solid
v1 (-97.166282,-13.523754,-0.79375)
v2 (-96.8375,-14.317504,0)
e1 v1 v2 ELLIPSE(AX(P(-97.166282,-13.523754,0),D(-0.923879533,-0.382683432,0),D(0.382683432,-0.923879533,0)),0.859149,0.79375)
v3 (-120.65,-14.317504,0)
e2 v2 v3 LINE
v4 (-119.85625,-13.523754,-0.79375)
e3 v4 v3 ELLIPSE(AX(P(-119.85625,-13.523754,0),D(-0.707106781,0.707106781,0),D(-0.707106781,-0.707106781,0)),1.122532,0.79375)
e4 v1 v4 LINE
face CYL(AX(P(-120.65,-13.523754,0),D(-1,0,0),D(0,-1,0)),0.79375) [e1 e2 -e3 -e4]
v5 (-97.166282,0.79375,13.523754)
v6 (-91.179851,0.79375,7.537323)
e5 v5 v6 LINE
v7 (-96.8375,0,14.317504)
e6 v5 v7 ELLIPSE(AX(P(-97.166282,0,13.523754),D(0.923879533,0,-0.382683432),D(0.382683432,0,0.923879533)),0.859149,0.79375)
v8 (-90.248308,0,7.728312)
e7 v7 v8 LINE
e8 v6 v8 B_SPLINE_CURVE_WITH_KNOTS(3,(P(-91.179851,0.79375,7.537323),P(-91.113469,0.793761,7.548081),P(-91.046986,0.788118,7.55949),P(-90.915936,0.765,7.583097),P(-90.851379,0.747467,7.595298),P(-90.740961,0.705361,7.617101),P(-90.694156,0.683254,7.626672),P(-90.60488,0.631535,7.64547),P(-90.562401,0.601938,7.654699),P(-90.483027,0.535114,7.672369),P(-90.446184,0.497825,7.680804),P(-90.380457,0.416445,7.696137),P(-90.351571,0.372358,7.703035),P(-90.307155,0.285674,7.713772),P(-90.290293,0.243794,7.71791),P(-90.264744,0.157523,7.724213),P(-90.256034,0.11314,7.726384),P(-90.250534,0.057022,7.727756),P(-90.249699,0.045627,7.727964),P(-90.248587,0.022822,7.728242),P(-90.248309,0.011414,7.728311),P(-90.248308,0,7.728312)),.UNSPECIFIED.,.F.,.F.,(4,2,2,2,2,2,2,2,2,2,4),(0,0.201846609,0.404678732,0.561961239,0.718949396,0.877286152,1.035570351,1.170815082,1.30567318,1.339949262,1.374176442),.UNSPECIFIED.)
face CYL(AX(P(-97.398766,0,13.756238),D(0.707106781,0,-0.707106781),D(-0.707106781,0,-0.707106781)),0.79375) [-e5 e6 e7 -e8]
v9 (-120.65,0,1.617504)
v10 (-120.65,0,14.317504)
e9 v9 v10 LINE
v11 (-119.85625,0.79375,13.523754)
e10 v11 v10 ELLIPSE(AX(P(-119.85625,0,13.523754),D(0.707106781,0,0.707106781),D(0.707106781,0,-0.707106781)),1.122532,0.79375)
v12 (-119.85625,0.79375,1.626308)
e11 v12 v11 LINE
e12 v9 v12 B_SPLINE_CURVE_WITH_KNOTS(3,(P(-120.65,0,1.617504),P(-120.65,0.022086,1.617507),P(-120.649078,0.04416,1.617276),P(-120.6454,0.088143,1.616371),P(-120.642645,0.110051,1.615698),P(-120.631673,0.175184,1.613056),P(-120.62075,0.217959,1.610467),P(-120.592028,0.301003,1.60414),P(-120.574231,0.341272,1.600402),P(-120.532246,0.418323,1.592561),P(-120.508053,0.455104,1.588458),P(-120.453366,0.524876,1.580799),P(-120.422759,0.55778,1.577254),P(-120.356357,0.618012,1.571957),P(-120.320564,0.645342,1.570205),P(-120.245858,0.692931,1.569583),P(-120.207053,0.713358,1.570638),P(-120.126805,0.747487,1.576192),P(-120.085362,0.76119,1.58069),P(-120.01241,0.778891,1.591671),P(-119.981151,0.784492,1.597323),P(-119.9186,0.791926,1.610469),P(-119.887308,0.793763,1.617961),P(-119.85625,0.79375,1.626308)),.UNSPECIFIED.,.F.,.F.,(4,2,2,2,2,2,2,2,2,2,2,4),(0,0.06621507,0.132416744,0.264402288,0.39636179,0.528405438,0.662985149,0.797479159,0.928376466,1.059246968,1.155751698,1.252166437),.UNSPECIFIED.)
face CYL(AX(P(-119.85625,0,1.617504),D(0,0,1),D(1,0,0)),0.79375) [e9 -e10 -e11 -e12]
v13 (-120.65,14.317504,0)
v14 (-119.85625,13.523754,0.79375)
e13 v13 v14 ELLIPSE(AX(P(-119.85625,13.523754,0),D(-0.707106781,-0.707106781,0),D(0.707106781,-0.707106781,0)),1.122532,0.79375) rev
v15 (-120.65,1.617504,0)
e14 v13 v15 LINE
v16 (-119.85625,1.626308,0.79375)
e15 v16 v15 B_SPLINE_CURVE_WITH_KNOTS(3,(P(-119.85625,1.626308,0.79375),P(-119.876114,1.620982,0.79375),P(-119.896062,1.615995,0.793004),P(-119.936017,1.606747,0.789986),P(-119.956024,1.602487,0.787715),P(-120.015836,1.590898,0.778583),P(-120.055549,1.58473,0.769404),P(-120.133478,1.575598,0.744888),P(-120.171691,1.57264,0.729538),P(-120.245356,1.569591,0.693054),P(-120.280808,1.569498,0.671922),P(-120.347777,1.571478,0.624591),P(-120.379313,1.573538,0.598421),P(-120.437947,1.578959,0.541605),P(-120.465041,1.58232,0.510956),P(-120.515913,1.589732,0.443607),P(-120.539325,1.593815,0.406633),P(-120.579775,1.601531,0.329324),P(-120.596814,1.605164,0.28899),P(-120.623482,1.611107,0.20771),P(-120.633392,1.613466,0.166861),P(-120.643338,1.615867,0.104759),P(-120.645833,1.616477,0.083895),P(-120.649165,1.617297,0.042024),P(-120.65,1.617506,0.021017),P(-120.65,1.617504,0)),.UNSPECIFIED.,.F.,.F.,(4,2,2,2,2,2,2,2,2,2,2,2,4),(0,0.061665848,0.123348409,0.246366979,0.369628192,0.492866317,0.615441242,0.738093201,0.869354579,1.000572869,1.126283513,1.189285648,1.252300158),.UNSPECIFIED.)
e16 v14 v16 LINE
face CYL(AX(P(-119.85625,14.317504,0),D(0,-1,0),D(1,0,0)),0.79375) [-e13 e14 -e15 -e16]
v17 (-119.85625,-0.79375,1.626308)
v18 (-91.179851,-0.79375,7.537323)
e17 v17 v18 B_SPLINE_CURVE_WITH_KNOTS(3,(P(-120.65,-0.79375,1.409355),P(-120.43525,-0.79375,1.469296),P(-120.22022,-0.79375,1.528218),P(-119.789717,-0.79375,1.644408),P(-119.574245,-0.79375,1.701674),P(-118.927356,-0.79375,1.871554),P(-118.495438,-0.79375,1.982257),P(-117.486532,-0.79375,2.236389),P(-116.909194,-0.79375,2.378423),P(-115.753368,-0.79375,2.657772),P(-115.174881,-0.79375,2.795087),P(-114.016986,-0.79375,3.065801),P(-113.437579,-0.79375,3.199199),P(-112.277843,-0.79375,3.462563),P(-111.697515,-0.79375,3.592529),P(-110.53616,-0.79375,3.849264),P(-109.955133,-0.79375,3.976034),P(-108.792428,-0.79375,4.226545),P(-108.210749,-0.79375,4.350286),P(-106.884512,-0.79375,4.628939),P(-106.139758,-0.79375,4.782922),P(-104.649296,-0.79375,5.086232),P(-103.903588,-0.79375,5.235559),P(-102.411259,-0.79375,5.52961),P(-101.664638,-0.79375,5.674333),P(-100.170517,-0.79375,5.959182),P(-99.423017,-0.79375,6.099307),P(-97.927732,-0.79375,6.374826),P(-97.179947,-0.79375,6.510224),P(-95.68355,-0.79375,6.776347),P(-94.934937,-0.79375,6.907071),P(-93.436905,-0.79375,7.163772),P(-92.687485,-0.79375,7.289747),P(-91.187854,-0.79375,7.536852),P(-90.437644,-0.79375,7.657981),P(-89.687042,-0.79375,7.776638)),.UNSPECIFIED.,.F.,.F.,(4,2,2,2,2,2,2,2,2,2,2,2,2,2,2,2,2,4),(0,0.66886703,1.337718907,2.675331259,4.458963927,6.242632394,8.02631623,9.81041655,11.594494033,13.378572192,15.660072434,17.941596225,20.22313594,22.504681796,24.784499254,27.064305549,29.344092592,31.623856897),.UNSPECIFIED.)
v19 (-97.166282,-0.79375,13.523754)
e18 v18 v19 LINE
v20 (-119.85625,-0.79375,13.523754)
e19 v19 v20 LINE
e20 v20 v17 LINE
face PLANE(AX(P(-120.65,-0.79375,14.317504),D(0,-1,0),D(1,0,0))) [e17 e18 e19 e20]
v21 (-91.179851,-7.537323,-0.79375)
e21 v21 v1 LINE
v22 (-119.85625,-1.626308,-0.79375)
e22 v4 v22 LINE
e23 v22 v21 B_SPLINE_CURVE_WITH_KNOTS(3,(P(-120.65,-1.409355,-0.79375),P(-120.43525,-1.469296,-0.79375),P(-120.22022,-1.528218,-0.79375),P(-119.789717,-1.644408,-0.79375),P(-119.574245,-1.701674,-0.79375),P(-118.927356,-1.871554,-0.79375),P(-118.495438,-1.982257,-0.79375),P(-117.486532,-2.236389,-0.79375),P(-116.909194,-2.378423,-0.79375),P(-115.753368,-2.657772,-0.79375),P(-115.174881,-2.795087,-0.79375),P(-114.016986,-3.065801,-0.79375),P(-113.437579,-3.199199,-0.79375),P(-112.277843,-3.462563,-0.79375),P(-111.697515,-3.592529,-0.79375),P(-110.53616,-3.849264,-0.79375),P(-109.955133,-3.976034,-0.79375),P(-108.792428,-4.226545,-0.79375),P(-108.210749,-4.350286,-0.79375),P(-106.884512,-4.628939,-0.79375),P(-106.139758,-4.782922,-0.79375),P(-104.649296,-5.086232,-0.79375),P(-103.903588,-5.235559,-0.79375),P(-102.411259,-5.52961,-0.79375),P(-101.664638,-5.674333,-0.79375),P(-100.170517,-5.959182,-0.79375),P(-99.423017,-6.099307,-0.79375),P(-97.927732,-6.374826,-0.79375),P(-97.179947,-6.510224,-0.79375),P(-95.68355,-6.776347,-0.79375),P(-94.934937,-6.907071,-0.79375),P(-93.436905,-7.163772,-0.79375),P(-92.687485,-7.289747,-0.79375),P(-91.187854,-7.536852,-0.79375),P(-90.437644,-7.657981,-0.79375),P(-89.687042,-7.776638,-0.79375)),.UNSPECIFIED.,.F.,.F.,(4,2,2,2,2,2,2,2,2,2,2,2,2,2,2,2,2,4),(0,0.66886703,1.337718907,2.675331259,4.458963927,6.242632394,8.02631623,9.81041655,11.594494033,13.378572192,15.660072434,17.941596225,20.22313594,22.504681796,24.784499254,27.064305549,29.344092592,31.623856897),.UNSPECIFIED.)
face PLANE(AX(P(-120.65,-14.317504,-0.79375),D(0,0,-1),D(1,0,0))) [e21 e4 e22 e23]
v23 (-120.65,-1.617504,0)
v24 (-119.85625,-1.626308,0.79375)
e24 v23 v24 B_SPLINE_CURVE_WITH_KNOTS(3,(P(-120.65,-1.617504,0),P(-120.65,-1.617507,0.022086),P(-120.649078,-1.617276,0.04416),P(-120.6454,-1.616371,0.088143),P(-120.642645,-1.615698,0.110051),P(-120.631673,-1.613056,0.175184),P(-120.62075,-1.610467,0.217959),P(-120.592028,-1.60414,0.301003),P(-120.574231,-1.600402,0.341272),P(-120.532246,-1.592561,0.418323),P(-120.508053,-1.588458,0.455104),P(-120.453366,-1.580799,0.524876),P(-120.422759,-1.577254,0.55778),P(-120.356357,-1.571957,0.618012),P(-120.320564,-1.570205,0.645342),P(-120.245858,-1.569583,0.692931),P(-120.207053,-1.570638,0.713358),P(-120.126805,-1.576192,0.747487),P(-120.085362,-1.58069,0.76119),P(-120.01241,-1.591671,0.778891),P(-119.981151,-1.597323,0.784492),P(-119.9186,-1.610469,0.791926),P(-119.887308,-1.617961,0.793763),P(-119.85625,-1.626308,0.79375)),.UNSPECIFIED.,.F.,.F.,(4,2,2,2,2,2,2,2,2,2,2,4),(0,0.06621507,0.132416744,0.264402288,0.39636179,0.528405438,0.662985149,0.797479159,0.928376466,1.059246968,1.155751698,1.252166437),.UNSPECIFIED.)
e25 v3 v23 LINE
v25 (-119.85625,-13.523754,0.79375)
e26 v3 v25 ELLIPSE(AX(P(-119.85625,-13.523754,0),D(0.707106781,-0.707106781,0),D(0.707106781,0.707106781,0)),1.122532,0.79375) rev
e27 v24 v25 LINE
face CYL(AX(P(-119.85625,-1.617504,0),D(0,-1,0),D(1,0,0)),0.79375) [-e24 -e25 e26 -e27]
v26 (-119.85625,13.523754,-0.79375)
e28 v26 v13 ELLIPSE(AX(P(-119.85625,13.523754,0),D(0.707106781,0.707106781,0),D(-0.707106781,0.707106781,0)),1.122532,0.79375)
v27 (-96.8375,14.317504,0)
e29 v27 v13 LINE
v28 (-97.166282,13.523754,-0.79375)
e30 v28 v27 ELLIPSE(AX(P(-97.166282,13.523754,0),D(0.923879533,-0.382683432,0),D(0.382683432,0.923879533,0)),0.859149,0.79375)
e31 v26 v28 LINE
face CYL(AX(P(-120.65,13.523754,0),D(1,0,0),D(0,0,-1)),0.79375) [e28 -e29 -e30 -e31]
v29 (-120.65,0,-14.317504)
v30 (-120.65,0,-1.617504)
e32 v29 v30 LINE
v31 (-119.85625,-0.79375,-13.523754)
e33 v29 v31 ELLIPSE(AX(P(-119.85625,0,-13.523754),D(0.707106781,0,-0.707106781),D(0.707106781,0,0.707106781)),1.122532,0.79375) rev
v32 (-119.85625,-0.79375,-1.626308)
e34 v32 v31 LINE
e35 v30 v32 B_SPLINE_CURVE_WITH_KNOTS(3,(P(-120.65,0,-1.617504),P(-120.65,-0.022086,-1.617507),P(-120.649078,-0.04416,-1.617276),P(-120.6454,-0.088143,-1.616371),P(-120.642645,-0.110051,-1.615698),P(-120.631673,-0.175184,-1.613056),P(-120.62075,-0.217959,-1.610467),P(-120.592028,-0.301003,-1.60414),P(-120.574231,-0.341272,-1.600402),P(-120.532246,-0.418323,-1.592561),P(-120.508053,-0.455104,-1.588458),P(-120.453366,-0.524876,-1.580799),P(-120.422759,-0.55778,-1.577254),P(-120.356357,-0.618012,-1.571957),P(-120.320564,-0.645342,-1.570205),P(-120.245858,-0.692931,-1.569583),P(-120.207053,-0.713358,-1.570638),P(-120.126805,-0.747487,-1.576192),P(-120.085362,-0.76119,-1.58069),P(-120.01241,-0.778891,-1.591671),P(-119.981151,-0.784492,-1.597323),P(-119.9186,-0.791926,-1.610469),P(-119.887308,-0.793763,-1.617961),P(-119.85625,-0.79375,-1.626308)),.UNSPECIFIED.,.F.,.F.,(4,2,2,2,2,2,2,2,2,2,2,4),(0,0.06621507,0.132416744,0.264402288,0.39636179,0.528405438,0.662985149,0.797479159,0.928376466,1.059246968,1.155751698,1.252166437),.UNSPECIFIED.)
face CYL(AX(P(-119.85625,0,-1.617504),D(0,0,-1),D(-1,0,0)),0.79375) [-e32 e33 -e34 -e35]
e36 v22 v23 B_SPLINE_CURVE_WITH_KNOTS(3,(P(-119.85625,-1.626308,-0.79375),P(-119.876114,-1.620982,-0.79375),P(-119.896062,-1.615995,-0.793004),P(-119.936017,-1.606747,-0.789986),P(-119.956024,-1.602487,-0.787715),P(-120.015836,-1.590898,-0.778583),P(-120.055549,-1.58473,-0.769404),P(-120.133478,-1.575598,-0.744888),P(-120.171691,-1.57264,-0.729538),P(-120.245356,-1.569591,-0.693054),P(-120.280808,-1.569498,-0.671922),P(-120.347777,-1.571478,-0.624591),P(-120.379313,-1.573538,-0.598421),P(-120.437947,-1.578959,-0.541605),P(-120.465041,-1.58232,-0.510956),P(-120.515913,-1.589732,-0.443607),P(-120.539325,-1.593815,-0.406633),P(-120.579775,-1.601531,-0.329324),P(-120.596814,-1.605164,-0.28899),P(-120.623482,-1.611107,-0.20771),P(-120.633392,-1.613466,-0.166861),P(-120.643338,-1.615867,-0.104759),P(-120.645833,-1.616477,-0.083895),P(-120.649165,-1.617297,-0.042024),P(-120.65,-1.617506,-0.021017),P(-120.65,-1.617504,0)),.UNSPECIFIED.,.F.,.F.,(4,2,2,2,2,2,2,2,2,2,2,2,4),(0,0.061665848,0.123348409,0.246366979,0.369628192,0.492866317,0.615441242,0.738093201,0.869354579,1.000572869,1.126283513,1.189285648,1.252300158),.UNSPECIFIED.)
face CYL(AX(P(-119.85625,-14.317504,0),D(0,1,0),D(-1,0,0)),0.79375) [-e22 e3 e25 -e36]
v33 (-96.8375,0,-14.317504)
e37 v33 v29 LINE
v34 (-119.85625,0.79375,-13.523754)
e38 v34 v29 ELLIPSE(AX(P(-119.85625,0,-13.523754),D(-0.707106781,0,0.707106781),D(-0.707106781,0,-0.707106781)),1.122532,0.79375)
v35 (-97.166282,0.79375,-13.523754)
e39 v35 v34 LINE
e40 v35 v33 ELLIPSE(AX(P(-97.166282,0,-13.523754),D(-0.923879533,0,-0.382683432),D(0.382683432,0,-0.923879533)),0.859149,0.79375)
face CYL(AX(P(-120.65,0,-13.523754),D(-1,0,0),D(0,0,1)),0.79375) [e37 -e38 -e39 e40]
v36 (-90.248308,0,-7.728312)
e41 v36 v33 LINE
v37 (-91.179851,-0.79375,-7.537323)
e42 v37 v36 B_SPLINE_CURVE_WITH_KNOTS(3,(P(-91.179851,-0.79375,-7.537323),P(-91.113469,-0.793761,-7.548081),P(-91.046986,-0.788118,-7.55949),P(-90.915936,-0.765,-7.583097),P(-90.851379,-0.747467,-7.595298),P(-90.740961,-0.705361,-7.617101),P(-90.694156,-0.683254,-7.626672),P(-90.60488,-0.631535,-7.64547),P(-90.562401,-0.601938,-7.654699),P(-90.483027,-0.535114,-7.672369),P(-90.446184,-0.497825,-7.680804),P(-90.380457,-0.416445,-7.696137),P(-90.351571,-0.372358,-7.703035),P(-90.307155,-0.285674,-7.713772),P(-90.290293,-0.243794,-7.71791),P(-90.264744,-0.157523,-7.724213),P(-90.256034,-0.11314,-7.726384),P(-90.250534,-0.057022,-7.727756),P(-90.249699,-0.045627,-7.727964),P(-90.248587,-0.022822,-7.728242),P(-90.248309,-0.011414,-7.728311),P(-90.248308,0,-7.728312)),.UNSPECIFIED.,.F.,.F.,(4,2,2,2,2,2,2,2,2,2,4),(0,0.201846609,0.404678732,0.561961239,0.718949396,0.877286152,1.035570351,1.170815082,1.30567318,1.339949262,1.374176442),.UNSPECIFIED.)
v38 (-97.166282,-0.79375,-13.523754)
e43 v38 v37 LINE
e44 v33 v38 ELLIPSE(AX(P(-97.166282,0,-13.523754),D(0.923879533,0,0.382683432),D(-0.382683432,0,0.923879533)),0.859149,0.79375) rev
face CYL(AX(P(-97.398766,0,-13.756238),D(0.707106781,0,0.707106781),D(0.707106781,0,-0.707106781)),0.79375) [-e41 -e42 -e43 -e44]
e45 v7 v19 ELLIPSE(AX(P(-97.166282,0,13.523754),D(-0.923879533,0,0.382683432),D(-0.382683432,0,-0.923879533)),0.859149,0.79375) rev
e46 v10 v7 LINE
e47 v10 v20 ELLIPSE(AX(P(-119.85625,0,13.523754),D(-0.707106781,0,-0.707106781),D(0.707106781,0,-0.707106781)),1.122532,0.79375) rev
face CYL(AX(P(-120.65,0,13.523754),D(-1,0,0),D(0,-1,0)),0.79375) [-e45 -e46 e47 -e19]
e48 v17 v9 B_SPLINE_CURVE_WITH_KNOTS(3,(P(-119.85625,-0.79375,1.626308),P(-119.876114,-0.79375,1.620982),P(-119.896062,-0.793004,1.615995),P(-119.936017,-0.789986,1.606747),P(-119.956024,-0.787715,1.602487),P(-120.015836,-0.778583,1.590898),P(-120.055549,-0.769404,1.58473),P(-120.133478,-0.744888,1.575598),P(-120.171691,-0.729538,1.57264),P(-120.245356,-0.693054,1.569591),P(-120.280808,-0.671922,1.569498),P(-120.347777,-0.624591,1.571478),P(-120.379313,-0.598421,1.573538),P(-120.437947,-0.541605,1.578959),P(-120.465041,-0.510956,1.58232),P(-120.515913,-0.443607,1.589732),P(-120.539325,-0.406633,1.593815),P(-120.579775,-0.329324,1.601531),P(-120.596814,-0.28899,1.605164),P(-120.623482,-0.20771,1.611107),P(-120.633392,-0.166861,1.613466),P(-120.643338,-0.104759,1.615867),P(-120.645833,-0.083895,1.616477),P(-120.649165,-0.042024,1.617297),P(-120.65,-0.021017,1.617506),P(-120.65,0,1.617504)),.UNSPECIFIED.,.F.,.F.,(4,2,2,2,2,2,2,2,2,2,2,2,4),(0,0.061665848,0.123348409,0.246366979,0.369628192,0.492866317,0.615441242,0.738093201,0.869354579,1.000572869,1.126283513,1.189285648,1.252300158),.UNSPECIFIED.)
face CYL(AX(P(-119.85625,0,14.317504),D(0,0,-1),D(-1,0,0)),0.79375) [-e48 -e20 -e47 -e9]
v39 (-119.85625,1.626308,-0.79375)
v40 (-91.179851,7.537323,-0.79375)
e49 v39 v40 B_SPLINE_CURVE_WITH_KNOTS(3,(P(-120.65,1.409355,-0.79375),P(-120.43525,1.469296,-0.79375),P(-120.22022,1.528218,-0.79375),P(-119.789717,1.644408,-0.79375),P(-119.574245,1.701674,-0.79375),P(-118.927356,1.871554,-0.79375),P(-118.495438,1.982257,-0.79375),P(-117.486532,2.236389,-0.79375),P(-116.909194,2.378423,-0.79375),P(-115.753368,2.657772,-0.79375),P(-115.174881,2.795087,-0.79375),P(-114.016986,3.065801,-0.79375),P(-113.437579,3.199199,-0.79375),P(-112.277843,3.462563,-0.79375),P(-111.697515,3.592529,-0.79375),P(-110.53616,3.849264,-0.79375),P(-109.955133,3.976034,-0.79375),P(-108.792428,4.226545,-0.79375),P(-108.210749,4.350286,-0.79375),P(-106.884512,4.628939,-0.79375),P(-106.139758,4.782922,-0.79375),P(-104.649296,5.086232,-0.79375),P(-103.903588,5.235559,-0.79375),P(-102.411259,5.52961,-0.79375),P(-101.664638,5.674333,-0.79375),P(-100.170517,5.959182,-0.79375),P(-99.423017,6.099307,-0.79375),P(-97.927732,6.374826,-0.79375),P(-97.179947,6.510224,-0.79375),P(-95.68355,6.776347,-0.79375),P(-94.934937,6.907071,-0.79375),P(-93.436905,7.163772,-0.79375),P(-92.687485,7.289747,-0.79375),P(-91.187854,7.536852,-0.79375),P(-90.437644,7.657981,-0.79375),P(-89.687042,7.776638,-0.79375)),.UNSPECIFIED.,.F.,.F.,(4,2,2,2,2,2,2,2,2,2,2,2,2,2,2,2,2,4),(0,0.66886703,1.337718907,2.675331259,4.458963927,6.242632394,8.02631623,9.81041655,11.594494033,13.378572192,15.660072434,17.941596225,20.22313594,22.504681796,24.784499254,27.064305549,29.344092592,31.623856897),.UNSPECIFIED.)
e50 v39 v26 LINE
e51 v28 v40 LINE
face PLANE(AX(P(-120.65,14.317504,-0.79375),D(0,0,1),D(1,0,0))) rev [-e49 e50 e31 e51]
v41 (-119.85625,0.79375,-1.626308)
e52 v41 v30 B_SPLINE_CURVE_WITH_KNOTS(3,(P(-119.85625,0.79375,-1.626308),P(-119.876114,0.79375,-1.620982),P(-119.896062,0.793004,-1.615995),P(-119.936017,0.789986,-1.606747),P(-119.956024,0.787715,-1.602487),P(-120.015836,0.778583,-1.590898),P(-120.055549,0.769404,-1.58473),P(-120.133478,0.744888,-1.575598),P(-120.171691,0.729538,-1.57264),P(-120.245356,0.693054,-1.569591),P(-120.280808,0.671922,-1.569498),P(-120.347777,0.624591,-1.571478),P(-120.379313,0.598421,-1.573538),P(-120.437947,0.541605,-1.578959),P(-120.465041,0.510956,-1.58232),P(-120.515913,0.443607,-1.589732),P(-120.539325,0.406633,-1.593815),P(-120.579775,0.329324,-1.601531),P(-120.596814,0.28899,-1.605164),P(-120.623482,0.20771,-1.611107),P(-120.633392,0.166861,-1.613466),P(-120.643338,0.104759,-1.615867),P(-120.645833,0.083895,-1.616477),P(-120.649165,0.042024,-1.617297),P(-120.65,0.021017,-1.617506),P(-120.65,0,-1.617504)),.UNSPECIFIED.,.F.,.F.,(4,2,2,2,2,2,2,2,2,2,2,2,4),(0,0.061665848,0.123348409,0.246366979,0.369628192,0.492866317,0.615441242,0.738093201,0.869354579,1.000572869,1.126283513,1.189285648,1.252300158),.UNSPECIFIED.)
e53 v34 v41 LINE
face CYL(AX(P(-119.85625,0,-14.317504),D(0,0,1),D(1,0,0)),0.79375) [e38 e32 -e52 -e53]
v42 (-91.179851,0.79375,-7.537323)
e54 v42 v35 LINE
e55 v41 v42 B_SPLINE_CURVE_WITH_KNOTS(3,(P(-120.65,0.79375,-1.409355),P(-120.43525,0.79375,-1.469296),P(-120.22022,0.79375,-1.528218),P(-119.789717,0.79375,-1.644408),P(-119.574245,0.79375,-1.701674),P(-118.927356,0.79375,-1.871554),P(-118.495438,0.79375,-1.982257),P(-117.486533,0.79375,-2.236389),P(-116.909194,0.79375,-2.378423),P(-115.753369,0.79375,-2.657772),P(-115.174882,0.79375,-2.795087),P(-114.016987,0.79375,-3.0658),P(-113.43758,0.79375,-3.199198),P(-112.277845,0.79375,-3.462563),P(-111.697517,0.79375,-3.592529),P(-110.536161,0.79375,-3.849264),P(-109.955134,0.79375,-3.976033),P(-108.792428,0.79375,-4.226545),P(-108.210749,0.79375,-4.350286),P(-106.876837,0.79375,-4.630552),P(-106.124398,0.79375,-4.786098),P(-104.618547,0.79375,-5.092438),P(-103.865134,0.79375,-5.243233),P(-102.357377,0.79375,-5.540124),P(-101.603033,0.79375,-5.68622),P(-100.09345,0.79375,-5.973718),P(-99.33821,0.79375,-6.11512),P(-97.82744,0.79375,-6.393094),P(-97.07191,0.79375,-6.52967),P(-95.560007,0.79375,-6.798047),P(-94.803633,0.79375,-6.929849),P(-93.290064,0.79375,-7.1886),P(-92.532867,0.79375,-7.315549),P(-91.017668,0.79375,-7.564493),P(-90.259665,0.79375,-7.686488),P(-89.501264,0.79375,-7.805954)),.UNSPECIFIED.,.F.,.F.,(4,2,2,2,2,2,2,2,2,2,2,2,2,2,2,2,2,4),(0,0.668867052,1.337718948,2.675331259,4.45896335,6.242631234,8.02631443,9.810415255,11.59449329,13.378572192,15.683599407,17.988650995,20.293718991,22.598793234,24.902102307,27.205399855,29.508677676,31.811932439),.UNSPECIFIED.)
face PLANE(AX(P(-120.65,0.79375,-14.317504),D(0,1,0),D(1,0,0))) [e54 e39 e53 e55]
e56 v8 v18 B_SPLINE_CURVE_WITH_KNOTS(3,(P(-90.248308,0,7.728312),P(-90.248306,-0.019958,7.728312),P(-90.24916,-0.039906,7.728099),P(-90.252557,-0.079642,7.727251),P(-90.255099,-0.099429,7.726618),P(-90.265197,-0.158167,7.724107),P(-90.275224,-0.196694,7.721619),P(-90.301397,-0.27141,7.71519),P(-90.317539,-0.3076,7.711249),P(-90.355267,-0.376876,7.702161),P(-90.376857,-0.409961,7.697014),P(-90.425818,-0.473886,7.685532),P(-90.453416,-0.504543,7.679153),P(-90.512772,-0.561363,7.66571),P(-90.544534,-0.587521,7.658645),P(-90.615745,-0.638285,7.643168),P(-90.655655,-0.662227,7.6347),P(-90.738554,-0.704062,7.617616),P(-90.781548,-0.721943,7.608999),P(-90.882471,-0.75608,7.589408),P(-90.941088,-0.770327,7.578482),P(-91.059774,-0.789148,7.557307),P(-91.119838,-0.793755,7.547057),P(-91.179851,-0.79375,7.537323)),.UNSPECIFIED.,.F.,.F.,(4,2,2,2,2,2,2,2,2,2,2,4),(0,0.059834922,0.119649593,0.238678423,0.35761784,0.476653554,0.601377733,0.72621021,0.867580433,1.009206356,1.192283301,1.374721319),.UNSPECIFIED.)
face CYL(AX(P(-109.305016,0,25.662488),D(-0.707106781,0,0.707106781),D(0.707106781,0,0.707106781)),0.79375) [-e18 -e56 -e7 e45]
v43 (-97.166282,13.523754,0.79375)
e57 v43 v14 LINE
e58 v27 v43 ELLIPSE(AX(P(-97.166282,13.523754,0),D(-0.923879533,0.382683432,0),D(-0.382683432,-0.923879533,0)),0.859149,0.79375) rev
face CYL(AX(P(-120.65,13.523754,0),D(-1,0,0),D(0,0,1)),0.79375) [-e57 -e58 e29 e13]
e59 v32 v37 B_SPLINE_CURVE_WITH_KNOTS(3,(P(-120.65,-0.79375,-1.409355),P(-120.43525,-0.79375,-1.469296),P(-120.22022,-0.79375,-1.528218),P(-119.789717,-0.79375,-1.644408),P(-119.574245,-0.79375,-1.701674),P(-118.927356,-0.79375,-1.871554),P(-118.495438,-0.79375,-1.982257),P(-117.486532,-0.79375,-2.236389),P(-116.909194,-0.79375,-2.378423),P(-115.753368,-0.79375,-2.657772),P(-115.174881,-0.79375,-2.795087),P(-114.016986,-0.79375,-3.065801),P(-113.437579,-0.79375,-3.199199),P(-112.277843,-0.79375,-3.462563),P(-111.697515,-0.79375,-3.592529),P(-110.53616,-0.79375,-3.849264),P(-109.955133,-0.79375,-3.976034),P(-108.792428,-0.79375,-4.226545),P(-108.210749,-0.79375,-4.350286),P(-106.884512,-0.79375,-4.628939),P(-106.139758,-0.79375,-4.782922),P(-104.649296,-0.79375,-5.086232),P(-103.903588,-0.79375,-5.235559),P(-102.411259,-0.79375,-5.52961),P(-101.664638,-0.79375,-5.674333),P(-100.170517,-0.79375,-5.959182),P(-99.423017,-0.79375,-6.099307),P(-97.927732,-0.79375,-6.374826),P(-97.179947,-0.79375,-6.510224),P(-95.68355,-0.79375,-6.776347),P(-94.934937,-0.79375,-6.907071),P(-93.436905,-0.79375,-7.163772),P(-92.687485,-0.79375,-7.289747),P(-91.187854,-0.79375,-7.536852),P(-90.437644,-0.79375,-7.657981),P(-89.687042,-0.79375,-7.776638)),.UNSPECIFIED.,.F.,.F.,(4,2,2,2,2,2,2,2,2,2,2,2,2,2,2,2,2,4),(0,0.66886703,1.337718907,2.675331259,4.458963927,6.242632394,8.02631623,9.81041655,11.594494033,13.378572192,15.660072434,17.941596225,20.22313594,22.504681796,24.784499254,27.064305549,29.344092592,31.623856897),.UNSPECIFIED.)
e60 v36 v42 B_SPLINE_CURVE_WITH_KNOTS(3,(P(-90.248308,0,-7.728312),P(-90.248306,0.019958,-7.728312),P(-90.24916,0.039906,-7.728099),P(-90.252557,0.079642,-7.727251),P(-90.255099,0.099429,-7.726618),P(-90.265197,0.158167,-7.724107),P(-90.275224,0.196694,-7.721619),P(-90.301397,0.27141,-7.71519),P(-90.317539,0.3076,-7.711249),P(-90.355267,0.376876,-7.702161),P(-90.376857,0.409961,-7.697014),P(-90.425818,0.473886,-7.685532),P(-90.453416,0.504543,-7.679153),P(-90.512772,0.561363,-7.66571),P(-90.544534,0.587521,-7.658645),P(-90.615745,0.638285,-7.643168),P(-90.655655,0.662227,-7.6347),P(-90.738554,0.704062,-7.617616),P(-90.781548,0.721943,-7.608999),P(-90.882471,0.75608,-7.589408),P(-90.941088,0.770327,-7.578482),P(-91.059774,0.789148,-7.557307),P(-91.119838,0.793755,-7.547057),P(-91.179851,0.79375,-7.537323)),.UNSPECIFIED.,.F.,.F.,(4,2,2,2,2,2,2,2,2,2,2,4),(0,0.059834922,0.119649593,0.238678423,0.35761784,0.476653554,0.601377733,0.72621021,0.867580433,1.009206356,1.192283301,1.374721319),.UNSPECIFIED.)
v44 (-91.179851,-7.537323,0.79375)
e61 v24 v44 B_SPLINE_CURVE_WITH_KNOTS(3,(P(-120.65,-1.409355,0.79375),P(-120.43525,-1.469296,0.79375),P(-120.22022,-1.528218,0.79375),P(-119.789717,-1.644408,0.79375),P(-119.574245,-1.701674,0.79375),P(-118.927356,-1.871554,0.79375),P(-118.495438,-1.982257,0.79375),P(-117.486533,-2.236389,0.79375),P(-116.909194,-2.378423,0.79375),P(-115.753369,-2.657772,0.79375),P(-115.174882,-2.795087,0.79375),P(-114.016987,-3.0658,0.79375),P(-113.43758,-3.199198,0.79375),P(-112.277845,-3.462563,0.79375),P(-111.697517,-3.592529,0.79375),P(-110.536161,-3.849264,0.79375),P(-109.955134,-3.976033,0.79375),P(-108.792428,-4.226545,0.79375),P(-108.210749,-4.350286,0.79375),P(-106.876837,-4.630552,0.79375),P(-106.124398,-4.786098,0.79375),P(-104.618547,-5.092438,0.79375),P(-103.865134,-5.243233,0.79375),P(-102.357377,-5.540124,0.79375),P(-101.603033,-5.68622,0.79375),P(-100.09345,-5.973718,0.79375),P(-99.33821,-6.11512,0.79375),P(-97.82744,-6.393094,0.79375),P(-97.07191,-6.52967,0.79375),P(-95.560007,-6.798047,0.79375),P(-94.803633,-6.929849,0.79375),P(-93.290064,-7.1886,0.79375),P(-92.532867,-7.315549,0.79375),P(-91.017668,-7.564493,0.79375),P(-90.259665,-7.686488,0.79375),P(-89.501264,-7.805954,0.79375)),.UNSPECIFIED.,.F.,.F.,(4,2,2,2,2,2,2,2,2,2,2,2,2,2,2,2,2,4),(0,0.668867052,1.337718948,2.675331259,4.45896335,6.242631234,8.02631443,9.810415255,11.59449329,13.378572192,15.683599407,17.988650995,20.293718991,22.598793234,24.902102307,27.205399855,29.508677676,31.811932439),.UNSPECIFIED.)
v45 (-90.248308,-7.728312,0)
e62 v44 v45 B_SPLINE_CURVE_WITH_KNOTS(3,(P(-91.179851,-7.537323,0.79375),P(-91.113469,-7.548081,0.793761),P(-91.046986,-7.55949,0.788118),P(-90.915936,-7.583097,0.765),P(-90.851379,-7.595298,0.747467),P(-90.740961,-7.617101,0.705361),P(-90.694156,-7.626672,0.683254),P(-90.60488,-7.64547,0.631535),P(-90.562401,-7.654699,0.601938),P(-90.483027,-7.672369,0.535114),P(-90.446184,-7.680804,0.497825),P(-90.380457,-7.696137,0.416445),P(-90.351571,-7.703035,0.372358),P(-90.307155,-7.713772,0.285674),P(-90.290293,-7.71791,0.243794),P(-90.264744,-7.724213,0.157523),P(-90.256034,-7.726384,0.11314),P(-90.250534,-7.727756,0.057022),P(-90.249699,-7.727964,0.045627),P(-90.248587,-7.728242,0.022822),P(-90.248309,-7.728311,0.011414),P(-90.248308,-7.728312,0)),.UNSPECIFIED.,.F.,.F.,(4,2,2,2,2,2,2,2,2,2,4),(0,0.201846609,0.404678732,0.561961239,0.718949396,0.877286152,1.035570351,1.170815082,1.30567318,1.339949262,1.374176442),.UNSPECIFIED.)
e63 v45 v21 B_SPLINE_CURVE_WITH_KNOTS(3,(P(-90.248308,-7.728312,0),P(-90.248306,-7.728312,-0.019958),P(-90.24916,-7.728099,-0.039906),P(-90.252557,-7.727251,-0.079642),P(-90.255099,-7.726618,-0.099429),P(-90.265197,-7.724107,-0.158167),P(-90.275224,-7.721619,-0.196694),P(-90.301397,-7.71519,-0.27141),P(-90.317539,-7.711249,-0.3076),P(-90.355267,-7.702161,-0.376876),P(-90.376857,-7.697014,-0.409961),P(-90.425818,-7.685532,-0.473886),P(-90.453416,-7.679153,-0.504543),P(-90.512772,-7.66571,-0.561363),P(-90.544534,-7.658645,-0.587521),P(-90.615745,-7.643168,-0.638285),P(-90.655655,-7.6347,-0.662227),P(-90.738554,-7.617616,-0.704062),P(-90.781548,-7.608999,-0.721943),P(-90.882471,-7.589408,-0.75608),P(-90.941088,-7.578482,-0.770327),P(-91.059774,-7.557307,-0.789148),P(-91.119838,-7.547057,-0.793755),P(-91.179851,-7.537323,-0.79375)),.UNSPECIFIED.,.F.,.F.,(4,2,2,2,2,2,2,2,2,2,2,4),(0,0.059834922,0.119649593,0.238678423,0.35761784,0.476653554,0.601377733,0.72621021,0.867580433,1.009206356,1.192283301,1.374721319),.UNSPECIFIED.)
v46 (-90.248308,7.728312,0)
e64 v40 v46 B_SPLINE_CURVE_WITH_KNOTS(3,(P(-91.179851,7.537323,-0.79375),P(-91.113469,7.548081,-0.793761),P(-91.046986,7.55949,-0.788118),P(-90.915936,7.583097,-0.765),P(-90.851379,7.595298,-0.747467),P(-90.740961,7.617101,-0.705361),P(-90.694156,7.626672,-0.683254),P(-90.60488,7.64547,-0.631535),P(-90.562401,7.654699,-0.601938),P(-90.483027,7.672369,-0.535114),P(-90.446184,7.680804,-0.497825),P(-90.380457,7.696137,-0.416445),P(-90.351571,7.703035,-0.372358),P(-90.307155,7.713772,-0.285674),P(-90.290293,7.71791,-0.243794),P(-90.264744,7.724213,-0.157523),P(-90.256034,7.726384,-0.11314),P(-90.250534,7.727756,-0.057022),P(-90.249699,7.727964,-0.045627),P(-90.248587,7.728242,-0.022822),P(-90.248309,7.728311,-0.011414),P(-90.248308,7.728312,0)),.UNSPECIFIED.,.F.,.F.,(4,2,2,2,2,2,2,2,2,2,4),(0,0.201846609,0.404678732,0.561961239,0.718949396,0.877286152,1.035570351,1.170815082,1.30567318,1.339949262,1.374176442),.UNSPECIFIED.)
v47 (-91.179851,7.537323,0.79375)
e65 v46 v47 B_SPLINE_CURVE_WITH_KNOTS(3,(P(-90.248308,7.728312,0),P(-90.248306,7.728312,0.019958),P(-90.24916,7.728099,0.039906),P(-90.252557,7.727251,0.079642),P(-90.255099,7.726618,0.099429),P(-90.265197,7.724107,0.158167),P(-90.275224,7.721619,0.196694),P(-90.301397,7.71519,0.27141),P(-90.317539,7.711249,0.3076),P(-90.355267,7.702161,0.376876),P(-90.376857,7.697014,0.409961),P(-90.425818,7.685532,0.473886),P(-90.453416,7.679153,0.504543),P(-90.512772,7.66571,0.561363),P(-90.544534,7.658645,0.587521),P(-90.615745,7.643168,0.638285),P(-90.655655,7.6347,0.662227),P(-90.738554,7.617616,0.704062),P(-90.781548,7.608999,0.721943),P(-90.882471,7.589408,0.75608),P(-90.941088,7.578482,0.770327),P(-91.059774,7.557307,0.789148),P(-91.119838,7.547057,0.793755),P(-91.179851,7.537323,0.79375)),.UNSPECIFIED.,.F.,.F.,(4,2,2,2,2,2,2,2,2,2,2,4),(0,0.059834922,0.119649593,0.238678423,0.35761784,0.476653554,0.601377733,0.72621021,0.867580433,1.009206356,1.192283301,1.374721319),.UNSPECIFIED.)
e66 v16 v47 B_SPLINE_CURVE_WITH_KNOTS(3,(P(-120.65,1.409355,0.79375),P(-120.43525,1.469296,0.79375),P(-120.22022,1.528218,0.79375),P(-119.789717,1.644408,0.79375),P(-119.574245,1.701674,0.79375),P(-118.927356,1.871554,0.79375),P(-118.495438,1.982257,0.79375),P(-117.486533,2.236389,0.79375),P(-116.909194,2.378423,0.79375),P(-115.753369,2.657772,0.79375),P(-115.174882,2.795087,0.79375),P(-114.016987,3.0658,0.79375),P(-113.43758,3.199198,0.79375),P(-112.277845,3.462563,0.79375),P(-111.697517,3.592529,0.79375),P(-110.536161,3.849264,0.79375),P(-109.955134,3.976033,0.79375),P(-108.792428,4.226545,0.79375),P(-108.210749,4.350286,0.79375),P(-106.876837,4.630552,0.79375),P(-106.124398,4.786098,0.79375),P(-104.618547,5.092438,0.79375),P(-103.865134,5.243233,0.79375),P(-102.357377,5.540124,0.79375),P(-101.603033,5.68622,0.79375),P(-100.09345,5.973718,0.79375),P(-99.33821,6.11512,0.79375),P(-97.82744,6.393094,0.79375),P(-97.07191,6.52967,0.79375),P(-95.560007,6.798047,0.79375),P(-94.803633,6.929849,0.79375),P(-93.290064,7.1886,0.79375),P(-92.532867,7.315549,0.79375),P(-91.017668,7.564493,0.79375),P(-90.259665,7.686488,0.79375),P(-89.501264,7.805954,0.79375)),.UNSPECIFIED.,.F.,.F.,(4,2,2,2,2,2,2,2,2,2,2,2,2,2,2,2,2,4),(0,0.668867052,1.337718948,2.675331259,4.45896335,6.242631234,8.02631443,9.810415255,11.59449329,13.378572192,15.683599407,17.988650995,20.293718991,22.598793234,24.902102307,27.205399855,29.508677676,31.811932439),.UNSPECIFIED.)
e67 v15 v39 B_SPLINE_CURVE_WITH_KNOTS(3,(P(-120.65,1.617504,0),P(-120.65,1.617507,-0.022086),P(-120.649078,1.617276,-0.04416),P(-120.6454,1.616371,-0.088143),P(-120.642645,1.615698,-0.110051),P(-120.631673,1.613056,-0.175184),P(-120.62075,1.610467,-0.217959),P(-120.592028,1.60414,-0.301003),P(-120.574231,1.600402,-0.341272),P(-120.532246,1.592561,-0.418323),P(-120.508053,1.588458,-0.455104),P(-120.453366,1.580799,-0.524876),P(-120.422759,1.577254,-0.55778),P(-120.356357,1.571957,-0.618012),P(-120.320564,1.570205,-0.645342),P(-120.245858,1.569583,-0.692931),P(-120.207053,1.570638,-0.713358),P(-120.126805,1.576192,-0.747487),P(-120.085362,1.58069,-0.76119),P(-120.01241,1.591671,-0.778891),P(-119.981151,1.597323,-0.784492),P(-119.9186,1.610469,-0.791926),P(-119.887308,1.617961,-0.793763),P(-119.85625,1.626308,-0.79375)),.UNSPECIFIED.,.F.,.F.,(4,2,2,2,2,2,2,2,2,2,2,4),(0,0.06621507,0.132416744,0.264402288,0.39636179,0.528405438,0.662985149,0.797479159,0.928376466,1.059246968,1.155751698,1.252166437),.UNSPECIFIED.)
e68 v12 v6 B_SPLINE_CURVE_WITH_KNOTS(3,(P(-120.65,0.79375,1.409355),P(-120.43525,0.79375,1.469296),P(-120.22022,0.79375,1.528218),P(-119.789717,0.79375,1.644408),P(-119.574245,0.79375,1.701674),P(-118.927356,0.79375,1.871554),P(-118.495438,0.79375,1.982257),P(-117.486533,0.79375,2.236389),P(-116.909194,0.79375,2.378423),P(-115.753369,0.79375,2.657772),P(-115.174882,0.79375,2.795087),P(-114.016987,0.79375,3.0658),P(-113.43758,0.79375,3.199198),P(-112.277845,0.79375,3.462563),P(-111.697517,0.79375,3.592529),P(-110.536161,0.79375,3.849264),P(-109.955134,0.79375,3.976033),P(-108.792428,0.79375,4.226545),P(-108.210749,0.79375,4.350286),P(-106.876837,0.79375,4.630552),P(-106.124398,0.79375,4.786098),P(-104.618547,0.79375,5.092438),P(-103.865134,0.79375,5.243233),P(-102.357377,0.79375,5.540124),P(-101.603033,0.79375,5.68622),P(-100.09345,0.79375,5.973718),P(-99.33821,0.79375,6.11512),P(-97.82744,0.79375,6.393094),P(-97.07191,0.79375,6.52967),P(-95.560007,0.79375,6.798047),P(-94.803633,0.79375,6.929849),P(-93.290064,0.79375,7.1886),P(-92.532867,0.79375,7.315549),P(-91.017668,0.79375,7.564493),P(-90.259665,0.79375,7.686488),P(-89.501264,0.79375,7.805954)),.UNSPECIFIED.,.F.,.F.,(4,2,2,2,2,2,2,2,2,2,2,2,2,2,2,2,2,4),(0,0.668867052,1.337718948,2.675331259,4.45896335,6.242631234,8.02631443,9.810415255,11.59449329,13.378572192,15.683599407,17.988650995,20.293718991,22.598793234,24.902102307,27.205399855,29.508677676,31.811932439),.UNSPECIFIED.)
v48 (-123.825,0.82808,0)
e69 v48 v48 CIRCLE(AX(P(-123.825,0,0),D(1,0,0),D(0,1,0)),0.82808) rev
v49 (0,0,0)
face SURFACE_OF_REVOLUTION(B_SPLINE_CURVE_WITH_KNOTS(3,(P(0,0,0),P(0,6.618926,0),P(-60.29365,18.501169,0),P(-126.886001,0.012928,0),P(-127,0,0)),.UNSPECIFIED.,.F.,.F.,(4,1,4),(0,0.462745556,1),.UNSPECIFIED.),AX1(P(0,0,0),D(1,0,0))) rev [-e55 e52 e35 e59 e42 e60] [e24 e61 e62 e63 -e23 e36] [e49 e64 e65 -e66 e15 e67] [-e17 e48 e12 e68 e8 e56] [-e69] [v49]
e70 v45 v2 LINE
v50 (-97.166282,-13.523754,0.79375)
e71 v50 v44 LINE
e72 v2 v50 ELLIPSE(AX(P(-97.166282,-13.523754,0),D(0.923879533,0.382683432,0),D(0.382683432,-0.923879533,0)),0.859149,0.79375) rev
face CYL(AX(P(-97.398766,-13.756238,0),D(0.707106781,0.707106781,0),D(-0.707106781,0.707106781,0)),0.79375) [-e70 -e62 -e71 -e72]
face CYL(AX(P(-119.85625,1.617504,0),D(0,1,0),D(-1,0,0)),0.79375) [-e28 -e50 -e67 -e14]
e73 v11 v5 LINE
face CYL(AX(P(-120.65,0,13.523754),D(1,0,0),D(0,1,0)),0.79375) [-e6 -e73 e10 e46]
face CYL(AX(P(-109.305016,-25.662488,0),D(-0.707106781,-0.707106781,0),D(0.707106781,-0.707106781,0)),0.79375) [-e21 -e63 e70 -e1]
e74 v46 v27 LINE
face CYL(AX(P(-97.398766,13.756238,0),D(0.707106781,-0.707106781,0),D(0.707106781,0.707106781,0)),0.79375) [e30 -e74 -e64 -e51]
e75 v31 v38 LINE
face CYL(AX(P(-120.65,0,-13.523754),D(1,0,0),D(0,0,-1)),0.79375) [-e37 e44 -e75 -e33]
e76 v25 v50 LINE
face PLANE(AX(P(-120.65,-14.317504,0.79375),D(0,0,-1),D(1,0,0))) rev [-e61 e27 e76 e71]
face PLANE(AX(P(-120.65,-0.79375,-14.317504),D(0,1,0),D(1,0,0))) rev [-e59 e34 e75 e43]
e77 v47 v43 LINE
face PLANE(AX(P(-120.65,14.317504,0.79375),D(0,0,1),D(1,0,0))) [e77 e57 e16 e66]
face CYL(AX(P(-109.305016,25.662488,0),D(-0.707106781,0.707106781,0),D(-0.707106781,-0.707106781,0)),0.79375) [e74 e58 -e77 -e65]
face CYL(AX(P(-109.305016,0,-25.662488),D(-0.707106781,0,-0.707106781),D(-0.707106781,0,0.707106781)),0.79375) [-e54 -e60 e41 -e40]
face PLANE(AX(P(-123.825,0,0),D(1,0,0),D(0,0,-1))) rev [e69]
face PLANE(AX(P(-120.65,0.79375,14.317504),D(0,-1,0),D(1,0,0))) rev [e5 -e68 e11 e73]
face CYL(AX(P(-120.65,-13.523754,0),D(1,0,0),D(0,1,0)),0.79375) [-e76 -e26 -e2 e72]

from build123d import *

# Parameters (mm, degrees)
CUT_EXTRUDE1_DEPTH      = 3.175
CUT_EXTRUDE1_DEPTH_BACK = 3.175
SKETCH3_R               = 6.509324081066561
BOSS_EXTRUDE5_DEPTH     = 0.79375
CIRPATTERN1_COUNT       = 4
FILLET2_R               = 0.79375


with BuildPart() as part:
    # Sketch2 → Revolve1 (revolve)
    with BuildSketch(Plane.XY):
        with BuildLine():
            Line((0, 0), (-127, -1.555e-14))
            add(Edge.make_bspline(
                [(-127, -1.555e-14), (-126.88600107696882, 0.01292807569490287), (-60.293650457458824, 18.501169159484686), (6.918e-14, 6.618926423252529), (0, 0)],
                knots=[0, 0, 0, 0, 0.5372544440165704, 1, 1, 1, 1], degree=3))
        make_face()
    revolve(axis=Axis((0, 0, 0), (-1, -1.2e-16, 0)))

    # Sketch3 → Cut-Extrude1 (cut, two sides: drawn at the far end of the back side and taken through both)
    with BuildSketch(Plane(origin=(-127, 0, 0), x_dir=(0, 0, -1), z_dir=(1, 0, 0)).offset(-CUT_EXTRUDE1_DEPTH_BACK)):
        Circle(SKETCH3_R)
    extrude(amount=CUT_EXTRUDE1_DEPTH + CUT_EXTRUDE1_DEPTH_BACK, mode=Mode.SUBTRACT)

    # Sketch4 → Boss-Extrude5 (add, symmetric)
    with BuildSketch(Plane.XY):
        Polygon((-120.64999999999937, 1.6175040904650868), (-120.65, 14.317504090465087), (-96.83750000000002, 14.317504090465087), (-90.2483075401766, 7.7283116306418425), (-89.68704153260985, 7.167045623074933), (-120.64999999999998, 0.8237540904650809), align=None)
    boss_extrude5 = extrude(amount=BOSS_EXTRUDE5_DEPTH, both=True)

    # CirPattern1: Boss-Extrude5 ×4 about axis
    cirpattern1_axis = Axis((0, -3.5e-16, 0), (1, 0, 0))
    for i in range(1, CIRPATTERN1_COUNT):
        add(boss_extrude5.rotate(cirpattern1_axis, i * 360 / CIRPATTERN1_COUNT))

    # Fillet2
    fillet2_edges = [part.edges().sort_by_distance(p)[0] for p in [
        (-93.52528303882053, 11.0052871292856, 0.79375),
        (-93.52528303882053, 11.005287129285604, -0.79375),
        (-108.74375, 14.317504090465087, -0.79375),
        (-108.74375, 14.317504090465087, 0.79375),
        (-120.64999999999999, 7.863429350843208, -0.79375),
        (-120.64999999999999, 7.863429350843208, 0.79375),
        (-120.64999999999999, 0.7937499999999978, -7.8634293508432105),
        (-120.64999999999999, -0.7937500000000021, -7.863429350843219),
        (-108.74375, 0.7937499999999964, -14.317504090465087),
        (-108.74375, -0.7937500000000035, -14.317504090465087),
        (-93.52528303882053, 0.7937499999999972, -11.005287129285605),
        (-93.52528303882053, -0.7937500000000027, -11.005287129285605),
        (-120.64999999999999, -7.863429350843224, -0.793749999999999),
        (-108.74375, -14.317504090465087, -0.7937499999999982),
        (-93.52528303882053, -11.005287129285612, -0.7937499999999986),
        (-120.64999999999999, -7.863429350843225, 0.793750000000001),
        (-93.52528303882053, -11.005287129285612, 0.7937500000000013),
        (-108.74375, -14.317504090465087, 0.7937500000000017),
        (-93.52528303882053, 0.7937500000000008, 11.005287129285605),
        (-93.52528303882053, -0.7937499999999991, 11.005287129285605),
        (-108.74375, -0.7937499999999987, 14.317504090465087),
        (-120.64999999999999, -0.7937499999999994, 7.8634293508432185),
        (-120.64999999999999, 0.7937500000000005, 7.863429350843211),
        (-108.74375, 0.7937500000000012, 14.317504090465087),
    ]]
    fillet(fillet2_edges, radius=FILLET2_R - 0.0001)  # a hair under: the kernel refuses the full size


solid = part.part
